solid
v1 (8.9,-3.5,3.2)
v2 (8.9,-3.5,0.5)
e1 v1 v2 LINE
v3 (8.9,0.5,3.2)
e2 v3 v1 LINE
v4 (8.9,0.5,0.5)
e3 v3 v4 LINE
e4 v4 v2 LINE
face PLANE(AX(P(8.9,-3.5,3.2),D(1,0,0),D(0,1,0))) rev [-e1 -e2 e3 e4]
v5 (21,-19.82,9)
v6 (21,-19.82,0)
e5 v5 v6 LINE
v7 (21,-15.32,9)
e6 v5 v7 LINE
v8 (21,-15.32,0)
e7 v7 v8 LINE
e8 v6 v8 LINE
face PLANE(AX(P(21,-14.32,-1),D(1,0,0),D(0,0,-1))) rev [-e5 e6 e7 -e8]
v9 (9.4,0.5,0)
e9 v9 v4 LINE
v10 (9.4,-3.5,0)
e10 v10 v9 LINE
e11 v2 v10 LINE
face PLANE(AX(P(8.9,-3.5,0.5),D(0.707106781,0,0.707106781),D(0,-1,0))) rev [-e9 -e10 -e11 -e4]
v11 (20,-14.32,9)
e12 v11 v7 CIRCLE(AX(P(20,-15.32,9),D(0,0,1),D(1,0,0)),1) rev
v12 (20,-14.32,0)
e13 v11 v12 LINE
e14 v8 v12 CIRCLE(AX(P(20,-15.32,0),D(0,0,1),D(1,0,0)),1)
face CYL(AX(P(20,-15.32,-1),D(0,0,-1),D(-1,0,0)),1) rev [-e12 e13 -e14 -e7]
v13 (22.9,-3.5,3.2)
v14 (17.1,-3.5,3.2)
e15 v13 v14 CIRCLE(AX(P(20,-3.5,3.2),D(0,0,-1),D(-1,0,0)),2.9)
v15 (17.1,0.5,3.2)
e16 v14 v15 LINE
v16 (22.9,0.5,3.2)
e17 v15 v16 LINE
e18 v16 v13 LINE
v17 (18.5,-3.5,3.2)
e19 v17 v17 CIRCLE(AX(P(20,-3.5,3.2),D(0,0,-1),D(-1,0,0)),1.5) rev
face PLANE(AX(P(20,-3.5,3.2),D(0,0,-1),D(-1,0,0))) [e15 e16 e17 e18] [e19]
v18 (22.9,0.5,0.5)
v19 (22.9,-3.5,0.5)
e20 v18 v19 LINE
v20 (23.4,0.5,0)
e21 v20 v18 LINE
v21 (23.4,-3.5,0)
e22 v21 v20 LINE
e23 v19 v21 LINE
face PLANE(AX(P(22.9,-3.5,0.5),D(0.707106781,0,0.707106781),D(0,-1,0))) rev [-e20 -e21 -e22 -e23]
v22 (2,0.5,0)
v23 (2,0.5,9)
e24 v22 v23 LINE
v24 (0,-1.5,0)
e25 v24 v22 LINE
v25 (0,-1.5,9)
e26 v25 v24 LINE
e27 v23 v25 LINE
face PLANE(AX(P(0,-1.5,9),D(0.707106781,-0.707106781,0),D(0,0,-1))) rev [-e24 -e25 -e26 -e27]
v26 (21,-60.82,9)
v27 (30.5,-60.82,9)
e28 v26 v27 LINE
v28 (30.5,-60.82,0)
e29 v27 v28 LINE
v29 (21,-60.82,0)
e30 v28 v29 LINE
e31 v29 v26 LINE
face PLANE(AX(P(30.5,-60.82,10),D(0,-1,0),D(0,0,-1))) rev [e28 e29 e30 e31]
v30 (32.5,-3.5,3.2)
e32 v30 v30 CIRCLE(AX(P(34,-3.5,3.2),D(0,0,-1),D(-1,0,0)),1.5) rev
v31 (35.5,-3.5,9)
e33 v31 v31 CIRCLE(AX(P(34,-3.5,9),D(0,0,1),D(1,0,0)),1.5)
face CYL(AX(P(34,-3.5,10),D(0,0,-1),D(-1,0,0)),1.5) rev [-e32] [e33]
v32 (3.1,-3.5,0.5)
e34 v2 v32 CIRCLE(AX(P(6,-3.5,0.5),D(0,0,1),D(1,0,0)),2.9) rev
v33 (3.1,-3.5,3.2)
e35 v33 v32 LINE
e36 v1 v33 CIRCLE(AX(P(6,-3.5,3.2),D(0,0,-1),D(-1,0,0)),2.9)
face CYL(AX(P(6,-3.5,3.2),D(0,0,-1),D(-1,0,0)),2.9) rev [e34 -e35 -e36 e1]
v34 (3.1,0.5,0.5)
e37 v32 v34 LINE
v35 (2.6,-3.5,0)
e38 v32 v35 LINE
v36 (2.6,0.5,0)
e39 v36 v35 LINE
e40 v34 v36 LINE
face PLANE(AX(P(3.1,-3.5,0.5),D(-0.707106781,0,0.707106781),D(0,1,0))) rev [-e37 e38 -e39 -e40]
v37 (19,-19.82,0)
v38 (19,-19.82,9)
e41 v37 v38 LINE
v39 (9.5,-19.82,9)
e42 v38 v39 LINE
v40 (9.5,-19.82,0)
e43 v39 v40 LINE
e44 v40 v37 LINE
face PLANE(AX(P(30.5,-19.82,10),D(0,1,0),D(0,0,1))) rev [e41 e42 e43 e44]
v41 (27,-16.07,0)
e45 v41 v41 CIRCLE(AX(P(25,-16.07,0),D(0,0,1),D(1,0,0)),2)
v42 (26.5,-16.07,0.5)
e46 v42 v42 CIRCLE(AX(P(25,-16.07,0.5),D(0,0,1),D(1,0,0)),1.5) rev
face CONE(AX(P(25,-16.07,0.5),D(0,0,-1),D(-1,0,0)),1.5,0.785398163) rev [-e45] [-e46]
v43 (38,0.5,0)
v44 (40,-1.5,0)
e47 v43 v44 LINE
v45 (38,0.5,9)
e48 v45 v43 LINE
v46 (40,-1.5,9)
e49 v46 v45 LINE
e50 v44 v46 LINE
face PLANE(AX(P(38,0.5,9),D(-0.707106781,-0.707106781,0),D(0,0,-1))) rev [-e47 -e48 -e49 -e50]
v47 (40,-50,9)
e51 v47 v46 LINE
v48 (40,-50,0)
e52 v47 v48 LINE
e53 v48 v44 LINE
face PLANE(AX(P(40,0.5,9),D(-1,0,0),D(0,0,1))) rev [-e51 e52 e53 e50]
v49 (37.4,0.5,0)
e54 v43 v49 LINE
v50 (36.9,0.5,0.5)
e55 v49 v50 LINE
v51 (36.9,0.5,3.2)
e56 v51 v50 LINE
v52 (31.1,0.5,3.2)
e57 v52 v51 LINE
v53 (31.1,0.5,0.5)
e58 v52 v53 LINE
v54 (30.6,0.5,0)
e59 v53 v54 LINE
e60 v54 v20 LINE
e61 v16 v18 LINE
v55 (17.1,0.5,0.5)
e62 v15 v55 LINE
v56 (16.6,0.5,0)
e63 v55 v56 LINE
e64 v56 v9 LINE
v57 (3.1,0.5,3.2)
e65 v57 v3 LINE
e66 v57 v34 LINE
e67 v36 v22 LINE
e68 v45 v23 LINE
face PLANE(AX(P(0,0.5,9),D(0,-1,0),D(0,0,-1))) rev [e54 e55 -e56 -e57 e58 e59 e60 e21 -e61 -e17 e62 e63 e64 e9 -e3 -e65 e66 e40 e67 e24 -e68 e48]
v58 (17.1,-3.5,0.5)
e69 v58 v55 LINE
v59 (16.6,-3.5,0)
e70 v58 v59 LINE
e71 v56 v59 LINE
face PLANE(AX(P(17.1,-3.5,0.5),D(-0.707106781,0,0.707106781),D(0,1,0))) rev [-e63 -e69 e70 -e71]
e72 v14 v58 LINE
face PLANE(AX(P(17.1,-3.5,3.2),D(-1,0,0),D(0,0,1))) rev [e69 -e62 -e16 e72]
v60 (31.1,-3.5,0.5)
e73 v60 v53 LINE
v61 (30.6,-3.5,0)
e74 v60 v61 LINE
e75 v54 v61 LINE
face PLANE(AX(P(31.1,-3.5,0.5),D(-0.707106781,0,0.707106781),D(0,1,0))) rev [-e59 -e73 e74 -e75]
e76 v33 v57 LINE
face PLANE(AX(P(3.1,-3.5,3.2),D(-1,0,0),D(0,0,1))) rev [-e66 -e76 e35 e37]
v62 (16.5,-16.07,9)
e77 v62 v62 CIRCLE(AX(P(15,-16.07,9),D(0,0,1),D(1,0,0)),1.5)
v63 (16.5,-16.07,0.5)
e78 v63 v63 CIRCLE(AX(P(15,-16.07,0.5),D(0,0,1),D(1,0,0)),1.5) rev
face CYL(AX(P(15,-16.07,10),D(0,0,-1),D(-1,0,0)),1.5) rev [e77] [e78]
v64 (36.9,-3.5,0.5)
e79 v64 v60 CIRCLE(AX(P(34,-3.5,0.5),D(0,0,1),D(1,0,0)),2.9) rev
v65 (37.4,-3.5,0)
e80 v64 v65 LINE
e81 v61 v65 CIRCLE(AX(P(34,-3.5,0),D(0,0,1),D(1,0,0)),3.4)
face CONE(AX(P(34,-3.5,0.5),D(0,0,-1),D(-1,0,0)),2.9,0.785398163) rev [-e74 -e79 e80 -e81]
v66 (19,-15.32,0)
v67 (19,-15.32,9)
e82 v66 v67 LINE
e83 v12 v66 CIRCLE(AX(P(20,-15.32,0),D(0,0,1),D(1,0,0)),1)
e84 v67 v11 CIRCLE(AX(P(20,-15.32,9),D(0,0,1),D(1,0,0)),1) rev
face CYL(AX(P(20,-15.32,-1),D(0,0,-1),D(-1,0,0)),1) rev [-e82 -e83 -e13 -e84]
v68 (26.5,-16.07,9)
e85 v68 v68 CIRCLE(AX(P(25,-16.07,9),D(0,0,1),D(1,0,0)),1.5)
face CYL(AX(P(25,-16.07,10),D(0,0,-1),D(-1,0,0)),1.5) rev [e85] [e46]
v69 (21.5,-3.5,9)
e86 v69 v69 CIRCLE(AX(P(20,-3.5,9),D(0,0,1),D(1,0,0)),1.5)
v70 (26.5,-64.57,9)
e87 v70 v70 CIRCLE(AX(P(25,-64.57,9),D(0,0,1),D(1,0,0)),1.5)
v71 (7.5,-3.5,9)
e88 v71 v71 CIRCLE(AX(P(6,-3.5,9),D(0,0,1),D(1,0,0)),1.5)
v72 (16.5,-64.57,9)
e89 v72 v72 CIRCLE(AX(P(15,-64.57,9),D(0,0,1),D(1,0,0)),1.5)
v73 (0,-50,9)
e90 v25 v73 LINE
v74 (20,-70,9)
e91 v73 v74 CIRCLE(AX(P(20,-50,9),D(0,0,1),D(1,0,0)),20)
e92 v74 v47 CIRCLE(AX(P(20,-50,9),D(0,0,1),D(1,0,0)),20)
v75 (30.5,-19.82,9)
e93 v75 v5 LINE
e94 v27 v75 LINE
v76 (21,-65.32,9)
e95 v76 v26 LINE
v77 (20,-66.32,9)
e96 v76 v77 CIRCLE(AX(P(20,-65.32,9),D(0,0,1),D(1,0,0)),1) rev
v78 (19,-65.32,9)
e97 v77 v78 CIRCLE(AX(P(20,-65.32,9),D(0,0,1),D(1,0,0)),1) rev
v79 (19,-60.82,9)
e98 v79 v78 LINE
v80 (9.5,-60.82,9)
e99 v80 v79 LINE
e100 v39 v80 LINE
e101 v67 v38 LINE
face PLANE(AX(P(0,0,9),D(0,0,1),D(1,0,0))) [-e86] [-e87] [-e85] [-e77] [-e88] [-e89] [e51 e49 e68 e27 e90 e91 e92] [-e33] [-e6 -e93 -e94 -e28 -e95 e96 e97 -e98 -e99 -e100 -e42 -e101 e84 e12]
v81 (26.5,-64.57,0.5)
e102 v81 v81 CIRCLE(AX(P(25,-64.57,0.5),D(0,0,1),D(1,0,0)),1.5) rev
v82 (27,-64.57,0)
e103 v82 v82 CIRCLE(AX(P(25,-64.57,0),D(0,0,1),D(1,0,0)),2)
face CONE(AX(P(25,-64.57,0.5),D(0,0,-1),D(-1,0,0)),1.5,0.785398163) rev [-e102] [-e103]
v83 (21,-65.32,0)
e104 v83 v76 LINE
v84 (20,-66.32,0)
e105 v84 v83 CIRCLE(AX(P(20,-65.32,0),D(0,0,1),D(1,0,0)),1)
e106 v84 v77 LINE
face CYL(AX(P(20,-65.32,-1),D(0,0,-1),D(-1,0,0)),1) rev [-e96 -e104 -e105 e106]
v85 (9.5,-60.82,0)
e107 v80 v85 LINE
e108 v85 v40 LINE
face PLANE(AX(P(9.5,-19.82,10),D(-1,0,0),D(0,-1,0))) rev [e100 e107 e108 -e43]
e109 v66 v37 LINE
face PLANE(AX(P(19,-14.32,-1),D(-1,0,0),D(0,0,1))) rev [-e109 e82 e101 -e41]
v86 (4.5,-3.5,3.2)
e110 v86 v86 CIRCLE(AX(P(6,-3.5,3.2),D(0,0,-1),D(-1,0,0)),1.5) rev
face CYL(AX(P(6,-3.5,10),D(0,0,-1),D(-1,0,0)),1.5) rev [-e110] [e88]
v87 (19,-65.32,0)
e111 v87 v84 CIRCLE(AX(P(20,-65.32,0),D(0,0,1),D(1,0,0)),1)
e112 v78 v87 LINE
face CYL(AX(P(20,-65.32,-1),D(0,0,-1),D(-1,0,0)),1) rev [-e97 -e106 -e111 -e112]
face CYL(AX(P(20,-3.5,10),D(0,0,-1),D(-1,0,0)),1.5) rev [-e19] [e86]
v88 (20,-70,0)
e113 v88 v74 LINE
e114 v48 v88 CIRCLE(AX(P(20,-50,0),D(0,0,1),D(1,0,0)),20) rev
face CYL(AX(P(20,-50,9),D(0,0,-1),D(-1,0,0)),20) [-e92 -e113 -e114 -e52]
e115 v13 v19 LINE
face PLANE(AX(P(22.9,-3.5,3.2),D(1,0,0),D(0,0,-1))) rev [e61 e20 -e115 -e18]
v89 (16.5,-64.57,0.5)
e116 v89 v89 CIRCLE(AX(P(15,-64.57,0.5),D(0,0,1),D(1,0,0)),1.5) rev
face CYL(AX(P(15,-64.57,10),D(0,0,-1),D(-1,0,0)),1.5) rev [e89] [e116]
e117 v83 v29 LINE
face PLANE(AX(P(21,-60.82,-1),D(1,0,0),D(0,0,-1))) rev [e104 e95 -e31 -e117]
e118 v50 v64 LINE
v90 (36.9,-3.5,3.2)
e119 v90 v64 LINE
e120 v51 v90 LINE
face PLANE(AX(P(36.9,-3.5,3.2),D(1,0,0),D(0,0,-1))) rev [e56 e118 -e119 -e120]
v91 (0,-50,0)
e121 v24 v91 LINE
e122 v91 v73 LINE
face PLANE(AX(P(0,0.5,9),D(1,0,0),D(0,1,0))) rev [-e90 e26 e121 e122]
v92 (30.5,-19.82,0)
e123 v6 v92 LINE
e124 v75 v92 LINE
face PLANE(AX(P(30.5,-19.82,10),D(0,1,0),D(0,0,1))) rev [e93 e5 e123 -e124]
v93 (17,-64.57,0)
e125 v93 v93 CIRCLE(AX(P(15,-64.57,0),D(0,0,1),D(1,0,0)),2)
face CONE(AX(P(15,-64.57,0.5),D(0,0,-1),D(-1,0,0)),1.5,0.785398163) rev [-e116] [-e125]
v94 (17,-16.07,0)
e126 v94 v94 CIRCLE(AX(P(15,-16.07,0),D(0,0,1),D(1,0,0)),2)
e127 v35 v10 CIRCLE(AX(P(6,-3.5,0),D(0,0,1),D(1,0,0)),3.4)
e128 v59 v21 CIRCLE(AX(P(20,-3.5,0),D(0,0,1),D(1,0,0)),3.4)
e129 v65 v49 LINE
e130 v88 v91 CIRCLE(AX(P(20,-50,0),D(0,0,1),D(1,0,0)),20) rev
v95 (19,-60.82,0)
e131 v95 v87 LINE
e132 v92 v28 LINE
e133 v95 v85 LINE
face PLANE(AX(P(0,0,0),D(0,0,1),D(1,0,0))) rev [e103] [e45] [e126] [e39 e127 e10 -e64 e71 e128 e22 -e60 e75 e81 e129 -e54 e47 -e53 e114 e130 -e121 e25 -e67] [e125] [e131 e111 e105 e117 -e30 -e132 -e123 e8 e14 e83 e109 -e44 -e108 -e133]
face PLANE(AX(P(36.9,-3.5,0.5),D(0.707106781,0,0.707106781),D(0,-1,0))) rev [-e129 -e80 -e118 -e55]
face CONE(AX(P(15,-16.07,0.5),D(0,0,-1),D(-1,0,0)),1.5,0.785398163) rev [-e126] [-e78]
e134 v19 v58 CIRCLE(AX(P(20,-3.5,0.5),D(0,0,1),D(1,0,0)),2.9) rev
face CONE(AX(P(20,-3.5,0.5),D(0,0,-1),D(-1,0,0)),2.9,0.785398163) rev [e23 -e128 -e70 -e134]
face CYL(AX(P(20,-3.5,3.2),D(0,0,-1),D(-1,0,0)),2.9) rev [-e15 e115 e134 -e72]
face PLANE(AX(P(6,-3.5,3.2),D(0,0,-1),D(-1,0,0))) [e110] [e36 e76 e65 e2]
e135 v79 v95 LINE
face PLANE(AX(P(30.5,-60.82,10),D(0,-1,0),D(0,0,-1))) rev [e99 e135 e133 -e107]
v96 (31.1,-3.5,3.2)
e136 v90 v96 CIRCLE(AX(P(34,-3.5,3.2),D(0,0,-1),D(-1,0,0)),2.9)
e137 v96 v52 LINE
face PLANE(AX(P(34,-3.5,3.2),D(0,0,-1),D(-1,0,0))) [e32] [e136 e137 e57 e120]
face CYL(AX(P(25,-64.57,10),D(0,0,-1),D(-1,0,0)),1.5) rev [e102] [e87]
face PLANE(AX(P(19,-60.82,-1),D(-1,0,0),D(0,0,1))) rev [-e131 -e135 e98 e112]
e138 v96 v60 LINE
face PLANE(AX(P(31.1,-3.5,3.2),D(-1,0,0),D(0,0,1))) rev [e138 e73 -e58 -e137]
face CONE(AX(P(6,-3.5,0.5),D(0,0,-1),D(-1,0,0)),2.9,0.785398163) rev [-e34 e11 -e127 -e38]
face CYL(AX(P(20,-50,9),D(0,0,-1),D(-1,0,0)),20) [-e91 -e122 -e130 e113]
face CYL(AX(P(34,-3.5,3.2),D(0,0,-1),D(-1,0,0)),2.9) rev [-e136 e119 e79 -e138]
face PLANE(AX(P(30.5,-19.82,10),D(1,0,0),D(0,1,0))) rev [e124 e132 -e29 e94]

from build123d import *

# Parameters (mm, degrees)
SKETCH_1_W          = 40
SKETCH_1_H          = 70.5
EXTRUDE_1_DEPTH     = 9
CHAMFER_1_SIZE      = 2
FILLET_3_R          = 20
SKETCH_2_W          = 21
SKETCH_2_H          = 41
CUT_EXTRUDE_1_DEPTH = 10
SKETCH_3_W          = 2
SKETCH_3_H          = 5.5
CUT_EXTRUDE_2_DEPTH = 10
SKETCH_4_R          = 1.5
CUT_EXTRUDE_3_DEPTH = 10
SKETCH_5_R          = 1.5
CUT_EXTRUDE_4_DEPTH = 10
FILLET_4_R          = 1
CUT_EXTRUDE_5_DEPTH = 3.2
CHAMFER_2_SIZE      = 0.5


with BuildPart() as part:
    # 草图1 → 凸台-拉伸1 (new body)
    with BuildSketch(Plane.XY):
        with Locations((20, -34.75)):
            Rectangle(SKETCH_1_W, SKETCH_1_H)
    extrude(amount=EXTRUDE_1_DEPTH)

    # 倒角1
    chamfer_1_edges = [part.edges().sort_by_distance(p)[0] for p in [
        (0, 0.5, 4.5),
        (40, 0.5, 4.5),
    ]]
    chamfer(chamfer_1_edges, length=CHAMFER_1_SIZE)

    # 圆角3
    fillet_3_edges = [part.edges().sort_by_distance(p)[0] for p in [
        (0, -70, 4.5),
        (40, -70, 4.5),
    ]]
    fillet(fillet_3_edges, radius=FILLET_3_R - 0.0001)  # a hair under: the kernel refuses the full size

    # 草图2 → 切除-拉伸1 (cut)
    with BuildSketch(Plane(origin=(0, 0, 0), x_dir=(-1, 0, 0), z_dir=(0, 0, -1))):
        with Locations((-20, -40.32)):
            Rectangle(SKETCH_2_W, SKETCH_2_H)
    extrude(amount=-CUT_EXTRUDE_1_DEPTH, mode=Mode.SUBTRACT)

    # 草图3 → 切除-拉伸2 (cut)
    with BuildSketch(Plane.XY.offset(9)):
        with Locations((20, -17.07)):
            Rectangle(SKETCH_3_W, SKETCH_3_H)
        with Locations((20, -63.57)):
            Rectangle(SKETCH_3_W, SKETCH_3_H)
    extrude(amount=-CUT_EXTRUDE_2_DEPTH, mode=Mode.SUBTRACT)

    # 草图4 → 切除-拉伸3 (cut)
    with BuildSketch(Plane(origin=(0, 0, 0), x_dir=(-1, 0, 0), z_dir=(0, 0, -1))):
        with Locations((-25, -16.07)):
            Circle(SKETCH_4_R)
        with Locations((-15, -16.07)):
            Circle(SKETCH_4_R)
        with Locations((-25, -64.57)):
            Circle(SKETCH_4_R)
        with Locations((-15, -64.57)):
            Circle(SKETCH_4_R)
    extrude(amount=-CUT_EXTRUDE_3_DEPTH, mode=Mode.SUBTRACT)

    # 草图5 → 切除-拉伸4 (cut)
    with BuildSketch(Plane(origin=(0, 0, 0), x_dir=(-1, 0, 0), z_dir=(0, 0, -1))):
        with Locations((-34, -3.5)):
            Circle(SKETCH_5_R)
        with Locations((-20, -3.5)):
            Circle(SKETCH_5_R)
        with Locations((-6, -3.5)):
            Circle(SKETCH_5_R)
    extrude(amount=-CUT_EXTRUDE_4_DEPTH, mode=Mode.SUBTRACT)

    # 圆角4
    fillet_4_edges = [part.edges().sort_by_distance(p)[0] for p in [
        (21, -66.32, 4.5),
        (19, -66.32, 4.5),
        (21, -14.32, 4.5),
        (19, -14.32, 4.5),
    ]]
    fillet(fillet_4_edges, radius=FILLET_4_R - 0.0001)  # a hair under: the kernel refuses the full size

    # 草图7 → 切除-拉伸5 (cut)
    with BuildSketch(Plane(origin=(0, 0, 0), x_dir=(-1, 0, 0), z_dir=(0, 0, -1))):
        with BuildLine():
            Line((-36.9, -3.5), (-36.9, 0.5))
            Line((-36.9, 0.5), (-31.1, 0.5))
            Line((-31.1, 0.5), (-31.1, -3.5))
            ThreePointArc((-31.1, -3.5), (-34, -6.4), (-36.9, -3.5))
        make_face()
        with BuildLine():
            Line((-17.1, -3.5), (-17.1, 0.5))
            Line((-17.1, 0.5), (-22.9, 0.5))
            Line((-22.9, 0.5), (-22.9, -3.5))
            ThreePointArc((-22.9, -3.5), (-20, -6.4), (-17.1, -3.5))
        make_face()
        with BuildLine():
            Line((-3.1, -3.5), (-3.1, 0.5))
            Line((-3.1, 0.5), (-8.9, 0.5))
            Line((-8.9, 0.5), (-8.9, -3.5))
            ThreePointArc((-8.9, -3.5), (-6, -6.4), (-3.1, -3.5))
        make_face()
    extrude(amount=-CUT_EXTRUDE_5_DEPTH, mode=Mode.SUBTRACT)

    # 倒角2
    chamfer_2_edges = [part.edges().sort_by_distance(p)[0] for p in [
        (16.5, -16.07, 0),
        (26.5, -64.57, 0),
        (16.5, -64.57, 0),
        (26.5, -16.07, 0),
        (34, -6.4, 0),
        (31.1, -1.5, 0),
        (36.9, -1.5, 0),
        (20, -6.4, 0),
        (17.1, -1.5, 0),
        (22.9, -1.5, 0),
        (6, -6.4, 0),
        (3.1, -1.5, 0),
        (8.9, -1.5, 0),
    ]]
    chamfer(chamfer_2_edges, length=CHAMFER_2_SIZE)


solid = part.part
